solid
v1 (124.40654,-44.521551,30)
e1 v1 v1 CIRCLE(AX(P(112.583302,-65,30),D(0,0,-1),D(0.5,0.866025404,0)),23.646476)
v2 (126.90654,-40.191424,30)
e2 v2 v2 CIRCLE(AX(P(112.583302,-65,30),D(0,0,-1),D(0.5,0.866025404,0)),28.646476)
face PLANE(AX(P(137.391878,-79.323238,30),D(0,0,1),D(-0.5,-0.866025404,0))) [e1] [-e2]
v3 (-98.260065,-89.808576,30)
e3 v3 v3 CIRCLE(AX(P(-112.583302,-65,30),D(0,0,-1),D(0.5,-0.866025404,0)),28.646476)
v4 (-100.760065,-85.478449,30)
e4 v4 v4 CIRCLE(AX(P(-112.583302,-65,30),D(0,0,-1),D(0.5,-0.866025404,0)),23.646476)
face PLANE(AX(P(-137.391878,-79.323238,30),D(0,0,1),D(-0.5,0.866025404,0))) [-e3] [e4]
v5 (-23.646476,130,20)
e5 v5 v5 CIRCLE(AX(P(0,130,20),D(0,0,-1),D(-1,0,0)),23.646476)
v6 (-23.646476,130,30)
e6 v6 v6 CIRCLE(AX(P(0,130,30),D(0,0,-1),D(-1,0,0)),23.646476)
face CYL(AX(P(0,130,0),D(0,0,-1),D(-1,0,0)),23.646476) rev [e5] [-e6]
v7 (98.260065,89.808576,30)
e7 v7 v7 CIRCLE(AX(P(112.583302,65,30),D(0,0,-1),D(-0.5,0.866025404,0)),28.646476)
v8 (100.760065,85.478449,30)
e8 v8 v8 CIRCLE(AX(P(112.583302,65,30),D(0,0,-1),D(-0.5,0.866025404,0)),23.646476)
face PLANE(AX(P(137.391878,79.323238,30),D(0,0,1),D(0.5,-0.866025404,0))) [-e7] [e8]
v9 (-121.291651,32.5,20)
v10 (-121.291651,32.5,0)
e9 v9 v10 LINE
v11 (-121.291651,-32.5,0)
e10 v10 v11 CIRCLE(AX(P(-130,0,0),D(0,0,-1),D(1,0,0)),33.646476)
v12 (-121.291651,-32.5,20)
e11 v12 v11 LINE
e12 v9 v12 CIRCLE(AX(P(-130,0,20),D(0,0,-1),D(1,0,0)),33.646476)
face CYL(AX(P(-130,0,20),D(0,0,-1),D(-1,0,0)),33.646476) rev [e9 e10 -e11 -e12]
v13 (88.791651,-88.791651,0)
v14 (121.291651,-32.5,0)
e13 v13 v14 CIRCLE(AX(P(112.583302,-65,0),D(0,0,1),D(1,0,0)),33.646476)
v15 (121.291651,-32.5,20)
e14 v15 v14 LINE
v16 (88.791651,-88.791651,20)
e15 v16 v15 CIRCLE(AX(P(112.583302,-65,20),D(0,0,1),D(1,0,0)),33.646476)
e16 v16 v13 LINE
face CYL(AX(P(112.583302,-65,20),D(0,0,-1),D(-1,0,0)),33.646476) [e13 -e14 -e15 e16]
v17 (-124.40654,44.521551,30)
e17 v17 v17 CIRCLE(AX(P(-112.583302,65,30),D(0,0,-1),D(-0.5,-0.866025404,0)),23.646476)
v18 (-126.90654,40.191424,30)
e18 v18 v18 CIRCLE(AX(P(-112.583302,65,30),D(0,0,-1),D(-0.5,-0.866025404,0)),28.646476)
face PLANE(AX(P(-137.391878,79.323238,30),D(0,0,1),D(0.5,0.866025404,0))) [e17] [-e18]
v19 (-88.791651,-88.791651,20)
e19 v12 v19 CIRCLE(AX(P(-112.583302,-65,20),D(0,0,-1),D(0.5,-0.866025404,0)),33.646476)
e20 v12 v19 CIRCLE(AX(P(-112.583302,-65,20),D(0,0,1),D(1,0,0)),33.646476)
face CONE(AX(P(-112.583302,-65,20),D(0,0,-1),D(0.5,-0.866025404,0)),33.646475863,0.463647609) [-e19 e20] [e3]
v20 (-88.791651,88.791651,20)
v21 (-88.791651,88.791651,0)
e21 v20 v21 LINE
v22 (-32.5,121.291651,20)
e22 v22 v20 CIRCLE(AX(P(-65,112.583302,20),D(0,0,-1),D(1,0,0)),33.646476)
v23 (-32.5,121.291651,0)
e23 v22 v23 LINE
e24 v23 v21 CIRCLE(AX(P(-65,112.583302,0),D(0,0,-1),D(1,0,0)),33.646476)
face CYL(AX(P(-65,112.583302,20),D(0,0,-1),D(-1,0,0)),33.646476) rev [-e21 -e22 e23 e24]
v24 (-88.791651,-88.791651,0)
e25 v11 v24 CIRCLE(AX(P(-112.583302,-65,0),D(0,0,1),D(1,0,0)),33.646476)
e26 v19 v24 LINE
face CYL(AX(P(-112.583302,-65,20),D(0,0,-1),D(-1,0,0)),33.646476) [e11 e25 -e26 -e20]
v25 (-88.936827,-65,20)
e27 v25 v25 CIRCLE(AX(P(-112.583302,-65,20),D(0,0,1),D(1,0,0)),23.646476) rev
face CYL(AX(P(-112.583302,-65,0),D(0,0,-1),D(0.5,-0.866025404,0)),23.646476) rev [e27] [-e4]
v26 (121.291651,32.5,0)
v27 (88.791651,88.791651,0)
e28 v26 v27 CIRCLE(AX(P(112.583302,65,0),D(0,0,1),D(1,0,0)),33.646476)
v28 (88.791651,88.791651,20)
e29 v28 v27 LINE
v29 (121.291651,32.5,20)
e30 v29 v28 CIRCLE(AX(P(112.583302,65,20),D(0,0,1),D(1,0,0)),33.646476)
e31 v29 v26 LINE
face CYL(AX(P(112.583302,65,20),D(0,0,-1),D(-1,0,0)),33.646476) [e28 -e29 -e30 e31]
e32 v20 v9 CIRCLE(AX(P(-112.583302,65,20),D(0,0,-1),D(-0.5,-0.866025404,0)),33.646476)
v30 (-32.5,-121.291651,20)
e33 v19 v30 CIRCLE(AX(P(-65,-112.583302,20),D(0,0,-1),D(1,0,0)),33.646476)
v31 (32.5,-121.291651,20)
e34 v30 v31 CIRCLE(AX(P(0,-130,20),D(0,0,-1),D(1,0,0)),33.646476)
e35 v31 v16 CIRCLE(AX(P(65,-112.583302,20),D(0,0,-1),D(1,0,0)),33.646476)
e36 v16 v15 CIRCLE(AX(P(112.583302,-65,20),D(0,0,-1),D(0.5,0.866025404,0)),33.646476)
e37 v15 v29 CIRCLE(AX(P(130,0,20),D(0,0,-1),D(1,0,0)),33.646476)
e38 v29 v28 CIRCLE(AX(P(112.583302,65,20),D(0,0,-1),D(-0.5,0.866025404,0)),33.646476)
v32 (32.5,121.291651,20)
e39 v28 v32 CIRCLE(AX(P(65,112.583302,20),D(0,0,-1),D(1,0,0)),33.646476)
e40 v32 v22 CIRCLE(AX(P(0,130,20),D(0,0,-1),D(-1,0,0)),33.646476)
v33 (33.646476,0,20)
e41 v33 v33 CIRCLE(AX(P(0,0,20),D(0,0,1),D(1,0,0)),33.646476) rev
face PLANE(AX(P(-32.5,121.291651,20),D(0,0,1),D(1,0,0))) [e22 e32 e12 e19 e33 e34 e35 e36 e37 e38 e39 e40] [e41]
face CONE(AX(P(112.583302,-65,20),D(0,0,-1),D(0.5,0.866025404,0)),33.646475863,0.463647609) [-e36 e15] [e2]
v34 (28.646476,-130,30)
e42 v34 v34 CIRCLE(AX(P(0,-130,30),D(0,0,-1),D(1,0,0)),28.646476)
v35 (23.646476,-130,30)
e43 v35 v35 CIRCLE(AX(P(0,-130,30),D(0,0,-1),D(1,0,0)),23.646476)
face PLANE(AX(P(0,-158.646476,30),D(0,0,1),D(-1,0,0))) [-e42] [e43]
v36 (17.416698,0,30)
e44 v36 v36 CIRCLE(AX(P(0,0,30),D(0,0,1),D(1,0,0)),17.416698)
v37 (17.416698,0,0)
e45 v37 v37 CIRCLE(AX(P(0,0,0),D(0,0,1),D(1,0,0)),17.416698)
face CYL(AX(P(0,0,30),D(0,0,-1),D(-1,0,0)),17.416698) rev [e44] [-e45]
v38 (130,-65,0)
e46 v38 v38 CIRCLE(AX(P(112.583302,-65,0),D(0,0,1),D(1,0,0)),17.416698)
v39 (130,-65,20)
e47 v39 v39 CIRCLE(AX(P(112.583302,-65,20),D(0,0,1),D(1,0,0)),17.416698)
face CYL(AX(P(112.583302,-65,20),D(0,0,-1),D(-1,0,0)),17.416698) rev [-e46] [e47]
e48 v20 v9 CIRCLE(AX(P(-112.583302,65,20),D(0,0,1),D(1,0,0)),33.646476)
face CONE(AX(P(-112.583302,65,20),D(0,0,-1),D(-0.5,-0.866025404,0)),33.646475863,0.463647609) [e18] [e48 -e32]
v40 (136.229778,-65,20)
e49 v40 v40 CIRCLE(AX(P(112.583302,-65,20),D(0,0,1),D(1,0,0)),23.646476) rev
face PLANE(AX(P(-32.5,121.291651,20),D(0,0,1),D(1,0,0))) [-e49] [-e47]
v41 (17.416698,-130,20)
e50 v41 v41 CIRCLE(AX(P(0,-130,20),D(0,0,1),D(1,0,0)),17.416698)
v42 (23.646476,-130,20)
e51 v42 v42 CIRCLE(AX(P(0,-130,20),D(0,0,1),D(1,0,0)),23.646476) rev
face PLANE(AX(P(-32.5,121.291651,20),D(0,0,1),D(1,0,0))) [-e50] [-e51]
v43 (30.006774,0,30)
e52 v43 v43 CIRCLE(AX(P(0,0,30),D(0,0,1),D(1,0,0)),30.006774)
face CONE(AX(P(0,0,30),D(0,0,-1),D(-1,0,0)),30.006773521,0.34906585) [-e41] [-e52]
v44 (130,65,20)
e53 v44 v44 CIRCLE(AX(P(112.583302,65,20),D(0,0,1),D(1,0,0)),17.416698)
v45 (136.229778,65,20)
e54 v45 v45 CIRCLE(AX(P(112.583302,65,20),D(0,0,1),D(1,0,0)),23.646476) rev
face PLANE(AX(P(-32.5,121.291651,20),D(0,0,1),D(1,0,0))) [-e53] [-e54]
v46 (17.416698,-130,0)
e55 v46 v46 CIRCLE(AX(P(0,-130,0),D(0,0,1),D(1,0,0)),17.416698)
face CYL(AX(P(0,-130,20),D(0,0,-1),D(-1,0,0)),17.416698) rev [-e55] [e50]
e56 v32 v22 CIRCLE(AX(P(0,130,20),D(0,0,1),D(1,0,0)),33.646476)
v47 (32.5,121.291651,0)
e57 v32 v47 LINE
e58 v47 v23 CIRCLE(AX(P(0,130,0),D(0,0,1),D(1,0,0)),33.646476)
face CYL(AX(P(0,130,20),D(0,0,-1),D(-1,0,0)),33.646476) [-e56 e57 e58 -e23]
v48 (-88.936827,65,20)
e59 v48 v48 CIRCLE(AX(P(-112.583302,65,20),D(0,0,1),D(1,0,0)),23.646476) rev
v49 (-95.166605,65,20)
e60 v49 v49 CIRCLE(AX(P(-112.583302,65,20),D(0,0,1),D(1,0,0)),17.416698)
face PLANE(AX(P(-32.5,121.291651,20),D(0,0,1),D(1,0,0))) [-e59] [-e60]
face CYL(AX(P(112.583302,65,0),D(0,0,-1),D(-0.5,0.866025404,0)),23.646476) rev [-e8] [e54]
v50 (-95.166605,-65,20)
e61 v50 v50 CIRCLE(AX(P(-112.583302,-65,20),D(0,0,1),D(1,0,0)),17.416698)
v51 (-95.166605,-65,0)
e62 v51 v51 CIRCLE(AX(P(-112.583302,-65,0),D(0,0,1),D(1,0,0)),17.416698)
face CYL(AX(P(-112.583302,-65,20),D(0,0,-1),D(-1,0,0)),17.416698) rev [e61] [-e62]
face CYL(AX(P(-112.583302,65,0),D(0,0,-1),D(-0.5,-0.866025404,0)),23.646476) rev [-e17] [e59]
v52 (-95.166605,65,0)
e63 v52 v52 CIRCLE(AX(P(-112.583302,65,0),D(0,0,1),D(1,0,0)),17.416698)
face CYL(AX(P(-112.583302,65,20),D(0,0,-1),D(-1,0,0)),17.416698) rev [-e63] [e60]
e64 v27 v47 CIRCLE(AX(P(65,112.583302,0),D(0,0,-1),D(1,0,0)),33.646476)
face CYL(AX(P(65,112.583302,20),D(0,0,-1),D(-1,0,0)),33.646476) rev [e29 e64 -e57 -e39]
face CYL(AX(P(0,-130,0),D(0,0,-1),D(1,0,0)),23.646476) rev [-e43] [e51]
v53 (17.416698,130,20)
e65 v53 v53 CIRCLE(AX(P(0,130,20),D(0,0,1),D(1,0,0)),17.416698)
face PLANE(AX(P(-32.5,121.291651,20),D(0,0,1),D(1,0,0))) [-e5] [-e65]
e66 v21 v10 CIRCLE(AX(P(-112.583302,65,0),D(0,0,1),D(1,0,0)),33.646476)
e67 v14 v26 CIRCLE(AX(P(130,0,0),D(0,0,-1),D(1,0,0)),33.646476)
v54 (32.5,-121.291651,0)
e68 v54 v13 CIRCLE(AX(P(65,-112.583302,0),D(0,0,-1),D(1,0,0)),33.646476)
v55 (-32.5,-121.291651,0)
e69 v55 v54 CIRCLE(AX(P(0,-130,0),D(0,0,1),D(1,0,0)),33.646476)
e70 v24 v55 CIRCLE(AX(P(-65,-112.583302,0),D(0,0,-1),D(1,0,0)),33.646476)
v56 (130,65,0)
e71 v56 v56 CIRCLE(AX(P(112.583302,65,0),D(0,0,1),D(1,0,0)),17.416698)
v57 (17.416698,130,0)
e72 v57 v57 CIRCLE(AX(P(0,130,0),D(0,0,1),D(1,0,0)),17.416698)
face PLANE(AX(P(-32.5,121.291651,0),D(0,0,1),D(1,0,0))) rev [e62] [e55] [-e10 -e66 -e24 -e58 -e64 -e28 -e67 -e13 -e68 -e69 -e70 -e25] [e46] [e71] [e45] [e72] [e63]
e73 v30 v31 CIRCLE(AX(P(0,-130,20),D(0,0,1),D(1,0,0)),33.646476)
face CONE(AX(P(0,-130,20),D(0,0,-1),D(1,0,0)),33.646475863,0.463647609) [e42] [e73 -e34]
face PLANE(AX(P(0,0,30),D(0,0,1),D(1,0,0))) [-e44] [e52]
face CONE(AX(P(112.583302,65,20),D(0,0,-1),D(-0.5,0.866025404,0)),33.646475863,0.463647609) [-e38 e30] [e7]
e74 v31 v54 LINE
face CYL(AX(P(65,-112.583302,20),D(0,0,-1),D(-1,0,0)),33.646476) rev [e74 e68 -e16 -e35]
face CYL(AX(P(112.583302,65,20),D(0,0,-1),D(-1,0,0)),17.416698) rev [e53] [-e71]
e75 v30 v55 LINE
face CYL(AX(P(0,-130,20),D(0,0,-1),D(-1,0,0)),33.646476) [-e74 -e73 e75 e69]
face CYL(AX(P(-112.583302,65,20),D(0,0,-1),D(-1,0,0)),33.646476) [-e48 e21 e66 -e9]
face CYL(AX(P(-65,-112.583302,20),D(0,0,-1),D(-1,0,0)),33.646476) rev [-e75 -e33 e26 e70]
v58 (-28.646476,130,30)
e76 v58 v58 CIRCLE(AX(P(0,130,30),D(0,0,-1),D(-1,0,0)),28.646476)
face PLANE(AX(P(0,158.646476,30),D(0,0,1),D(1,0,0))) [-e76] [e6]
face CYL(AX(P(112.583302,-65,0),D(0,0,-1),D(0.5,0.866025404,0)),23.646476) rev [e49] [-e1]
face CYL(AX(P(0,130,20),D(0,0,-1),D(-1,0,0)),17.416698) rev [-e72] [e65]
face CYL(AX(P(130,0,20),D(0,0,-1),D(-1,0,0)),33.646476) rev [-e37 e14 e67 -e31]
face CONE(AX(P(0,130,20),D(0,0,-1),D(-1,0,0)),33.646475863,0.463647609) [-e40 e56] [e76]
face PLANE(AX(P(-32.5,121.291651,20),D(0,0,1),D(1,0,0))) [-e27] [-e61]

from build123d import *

# Parameters (mm, degrees)
SKETCH2_R           = 17.416697508
BOSS_EXTRUDE1_DEPTH = 20
SKETCH7_R           = 17.416697508
CUT_EXTRUDE2_DEPTH  = 20
CIRPATTERN1_COUNT   = 6
SKETCH8_R           = 33.646475863
BOSS_EXTRUDE2_DEPTH = 30
SKETCH10_R          = 17.416697508
CUT_EXTRUDE3_DEPTH  = 30
CHAMFER1_SIZE2      = 3.639702343
CHAMFER1_SIZE       = 10


with BuildPart() as part:
    # Sketch2 → Boss-Extrude1 (new body)
    with BuildSketch(Plane.XY):
        with BuildLine():
            ThreePointArc((32.5, 121.291651246), (0, 163.646475863), (-32.5, 121.291651246))
            ThreePointArc((-32.5, 121.291651246), (-48.176762068, 83.444599647), (-88.791651246, 88.791651246))
            ThreePointArc((-88.791651246, 88.791651246), (-141.722005337, 81.823237932), (-121.291651246, 32.5))
            ThreePointArc((-121.291651246, 32.5), (-96.353524137, 0), (-121.291651246, -32.5))
            ThreePointArc((-121.291651246, -32.5), (-141.722005337, -81.823237932), (-88.791651246, -88.791651246))
            ThreePointArc((-88.791651246, -88.791651246), (-48.176762068, -83.444599647), (-32.5, -121.291651246))
            ThreePointArc((-32.5, -121.291651246), (0, -163.646475863), (32.5, -121.291651246))
            ThreePointArc((32.5, -121.291651246), (48.176762068, -83.444599647), (88.791651246, -88.791651246))
            ThreePointArc((88.791651246, -88.791651246), (141.722005337, -81.823237932), (121.291651246, -32.5))
            ThreePointArc((121.291651246, -32.5), (96.353524137, 0), (121.291651246, 32.5))
            ThreePointArc((121.291651246, 32.5), (141.722005337, 81.823237932), (88.791651246, 88.791651246))
            ThreePointArc((88.791651246, 88.791651246), (48.176762068, 83.444599647), (32.5, 121.291651246))
        make_face()
        with Locations((0, 130)):
            Circle(SKETCH2_R, mode=Mode.SUBTRACT)
        with Locations((112.583302492, 65)):
            Circle(SKETCH2_R, mode=Mode.SUBTRACT)
        with Locations((112.583302492, -65)):
            Circle(SKETCH2_R, mode=Mode.SUBTRACT)
        with Locations((0, -130)):
            Circle(SKETCH2_R, mode=Mode.SUBTRACT)
        with Locations((-112.583302492, -65)):
            Circle(SKETCH2_R, mode=Mode.SUBTRACT)
        with Locations((-112.583302492, 65)):
            Circle(SKETCH2_R, mode=Mode.SUBTRACT)
    extrude(amount=BOSS_EXTRUDE1_DEPTH)

    # Sketch4 → Revolve1 (revolve)
    with BuildSketch(Plane(origin=(0, 0, 0), x_dir=(0, 0, -1), z_dir=(1, 0, 0)), mode=Mode.PRIVATE) as revolve1_sk:
        Polygon((-20, 163.646475863), (-30, 158.646475863), (-30, 153.646475863), (-20, 153.646475863), align=None)
    revolve1 = revolve(revolve1_sk.sketch.rotate(Axis((0, 130, 0), (0, 0, 1)), 90), axis=Axis((0, 130, 0), (0, 0, 1)))

    # Sketch7 → Cut-Extrude2 (cut)
    with BuildSketch(Plane.XY):
        Circle(SKETCH7_R)
    extrude(amount=CUT_EXTRUDE2_DEPTH, mode=Mode.SUBTRACT)

    # CirPattern1: Revolve1 ×6 about axis
    cirpattern1_axis = Axis((0, 0, 0), (0, 0, 1))
    for i in range(1, CIRPATTERN1_COUNT):
        add(revolve1.rotate(cirpattern1_axis, i * 360 / CIRPATTERN1_COUNT))

    # Sketch8 → Boss-Extrude2 (add)
    with BuildSketch(Plane.XY):
        Circle(SKETCH8_R)
    extrude(amount=BOSS_EXTRUDE2_DEPTH)

    # Sketch10 → Cut-Extrude3 (cut)
    with BuildSketch(Plane.XY):
        Circle(SKETCH10_R)
    extrude(amount=CUT_EXTRUDE3_DEPTH, mode=Mode.SUBTRACT)

    # Chamfer1
    chamfer1_edges = [part.edges().sort_by_distance(p)[0] for p in [
        (-33.646475863, 0, 30),
    ]]
    chamfer1_side = [part.faces().sort_by_distance(p)[0] for p in [
        (-33.646475863, 0, 29.927205953),
    ]]
    chamfer(chamfer1_edges, length=CHAMFER1_SIZE - 0.0001, length2=CHAMFER1_SIZE2 - 0.0001, reference=chamfer1_side[0])  # a hair under: the kernel refuses the full size


solid = part.part
